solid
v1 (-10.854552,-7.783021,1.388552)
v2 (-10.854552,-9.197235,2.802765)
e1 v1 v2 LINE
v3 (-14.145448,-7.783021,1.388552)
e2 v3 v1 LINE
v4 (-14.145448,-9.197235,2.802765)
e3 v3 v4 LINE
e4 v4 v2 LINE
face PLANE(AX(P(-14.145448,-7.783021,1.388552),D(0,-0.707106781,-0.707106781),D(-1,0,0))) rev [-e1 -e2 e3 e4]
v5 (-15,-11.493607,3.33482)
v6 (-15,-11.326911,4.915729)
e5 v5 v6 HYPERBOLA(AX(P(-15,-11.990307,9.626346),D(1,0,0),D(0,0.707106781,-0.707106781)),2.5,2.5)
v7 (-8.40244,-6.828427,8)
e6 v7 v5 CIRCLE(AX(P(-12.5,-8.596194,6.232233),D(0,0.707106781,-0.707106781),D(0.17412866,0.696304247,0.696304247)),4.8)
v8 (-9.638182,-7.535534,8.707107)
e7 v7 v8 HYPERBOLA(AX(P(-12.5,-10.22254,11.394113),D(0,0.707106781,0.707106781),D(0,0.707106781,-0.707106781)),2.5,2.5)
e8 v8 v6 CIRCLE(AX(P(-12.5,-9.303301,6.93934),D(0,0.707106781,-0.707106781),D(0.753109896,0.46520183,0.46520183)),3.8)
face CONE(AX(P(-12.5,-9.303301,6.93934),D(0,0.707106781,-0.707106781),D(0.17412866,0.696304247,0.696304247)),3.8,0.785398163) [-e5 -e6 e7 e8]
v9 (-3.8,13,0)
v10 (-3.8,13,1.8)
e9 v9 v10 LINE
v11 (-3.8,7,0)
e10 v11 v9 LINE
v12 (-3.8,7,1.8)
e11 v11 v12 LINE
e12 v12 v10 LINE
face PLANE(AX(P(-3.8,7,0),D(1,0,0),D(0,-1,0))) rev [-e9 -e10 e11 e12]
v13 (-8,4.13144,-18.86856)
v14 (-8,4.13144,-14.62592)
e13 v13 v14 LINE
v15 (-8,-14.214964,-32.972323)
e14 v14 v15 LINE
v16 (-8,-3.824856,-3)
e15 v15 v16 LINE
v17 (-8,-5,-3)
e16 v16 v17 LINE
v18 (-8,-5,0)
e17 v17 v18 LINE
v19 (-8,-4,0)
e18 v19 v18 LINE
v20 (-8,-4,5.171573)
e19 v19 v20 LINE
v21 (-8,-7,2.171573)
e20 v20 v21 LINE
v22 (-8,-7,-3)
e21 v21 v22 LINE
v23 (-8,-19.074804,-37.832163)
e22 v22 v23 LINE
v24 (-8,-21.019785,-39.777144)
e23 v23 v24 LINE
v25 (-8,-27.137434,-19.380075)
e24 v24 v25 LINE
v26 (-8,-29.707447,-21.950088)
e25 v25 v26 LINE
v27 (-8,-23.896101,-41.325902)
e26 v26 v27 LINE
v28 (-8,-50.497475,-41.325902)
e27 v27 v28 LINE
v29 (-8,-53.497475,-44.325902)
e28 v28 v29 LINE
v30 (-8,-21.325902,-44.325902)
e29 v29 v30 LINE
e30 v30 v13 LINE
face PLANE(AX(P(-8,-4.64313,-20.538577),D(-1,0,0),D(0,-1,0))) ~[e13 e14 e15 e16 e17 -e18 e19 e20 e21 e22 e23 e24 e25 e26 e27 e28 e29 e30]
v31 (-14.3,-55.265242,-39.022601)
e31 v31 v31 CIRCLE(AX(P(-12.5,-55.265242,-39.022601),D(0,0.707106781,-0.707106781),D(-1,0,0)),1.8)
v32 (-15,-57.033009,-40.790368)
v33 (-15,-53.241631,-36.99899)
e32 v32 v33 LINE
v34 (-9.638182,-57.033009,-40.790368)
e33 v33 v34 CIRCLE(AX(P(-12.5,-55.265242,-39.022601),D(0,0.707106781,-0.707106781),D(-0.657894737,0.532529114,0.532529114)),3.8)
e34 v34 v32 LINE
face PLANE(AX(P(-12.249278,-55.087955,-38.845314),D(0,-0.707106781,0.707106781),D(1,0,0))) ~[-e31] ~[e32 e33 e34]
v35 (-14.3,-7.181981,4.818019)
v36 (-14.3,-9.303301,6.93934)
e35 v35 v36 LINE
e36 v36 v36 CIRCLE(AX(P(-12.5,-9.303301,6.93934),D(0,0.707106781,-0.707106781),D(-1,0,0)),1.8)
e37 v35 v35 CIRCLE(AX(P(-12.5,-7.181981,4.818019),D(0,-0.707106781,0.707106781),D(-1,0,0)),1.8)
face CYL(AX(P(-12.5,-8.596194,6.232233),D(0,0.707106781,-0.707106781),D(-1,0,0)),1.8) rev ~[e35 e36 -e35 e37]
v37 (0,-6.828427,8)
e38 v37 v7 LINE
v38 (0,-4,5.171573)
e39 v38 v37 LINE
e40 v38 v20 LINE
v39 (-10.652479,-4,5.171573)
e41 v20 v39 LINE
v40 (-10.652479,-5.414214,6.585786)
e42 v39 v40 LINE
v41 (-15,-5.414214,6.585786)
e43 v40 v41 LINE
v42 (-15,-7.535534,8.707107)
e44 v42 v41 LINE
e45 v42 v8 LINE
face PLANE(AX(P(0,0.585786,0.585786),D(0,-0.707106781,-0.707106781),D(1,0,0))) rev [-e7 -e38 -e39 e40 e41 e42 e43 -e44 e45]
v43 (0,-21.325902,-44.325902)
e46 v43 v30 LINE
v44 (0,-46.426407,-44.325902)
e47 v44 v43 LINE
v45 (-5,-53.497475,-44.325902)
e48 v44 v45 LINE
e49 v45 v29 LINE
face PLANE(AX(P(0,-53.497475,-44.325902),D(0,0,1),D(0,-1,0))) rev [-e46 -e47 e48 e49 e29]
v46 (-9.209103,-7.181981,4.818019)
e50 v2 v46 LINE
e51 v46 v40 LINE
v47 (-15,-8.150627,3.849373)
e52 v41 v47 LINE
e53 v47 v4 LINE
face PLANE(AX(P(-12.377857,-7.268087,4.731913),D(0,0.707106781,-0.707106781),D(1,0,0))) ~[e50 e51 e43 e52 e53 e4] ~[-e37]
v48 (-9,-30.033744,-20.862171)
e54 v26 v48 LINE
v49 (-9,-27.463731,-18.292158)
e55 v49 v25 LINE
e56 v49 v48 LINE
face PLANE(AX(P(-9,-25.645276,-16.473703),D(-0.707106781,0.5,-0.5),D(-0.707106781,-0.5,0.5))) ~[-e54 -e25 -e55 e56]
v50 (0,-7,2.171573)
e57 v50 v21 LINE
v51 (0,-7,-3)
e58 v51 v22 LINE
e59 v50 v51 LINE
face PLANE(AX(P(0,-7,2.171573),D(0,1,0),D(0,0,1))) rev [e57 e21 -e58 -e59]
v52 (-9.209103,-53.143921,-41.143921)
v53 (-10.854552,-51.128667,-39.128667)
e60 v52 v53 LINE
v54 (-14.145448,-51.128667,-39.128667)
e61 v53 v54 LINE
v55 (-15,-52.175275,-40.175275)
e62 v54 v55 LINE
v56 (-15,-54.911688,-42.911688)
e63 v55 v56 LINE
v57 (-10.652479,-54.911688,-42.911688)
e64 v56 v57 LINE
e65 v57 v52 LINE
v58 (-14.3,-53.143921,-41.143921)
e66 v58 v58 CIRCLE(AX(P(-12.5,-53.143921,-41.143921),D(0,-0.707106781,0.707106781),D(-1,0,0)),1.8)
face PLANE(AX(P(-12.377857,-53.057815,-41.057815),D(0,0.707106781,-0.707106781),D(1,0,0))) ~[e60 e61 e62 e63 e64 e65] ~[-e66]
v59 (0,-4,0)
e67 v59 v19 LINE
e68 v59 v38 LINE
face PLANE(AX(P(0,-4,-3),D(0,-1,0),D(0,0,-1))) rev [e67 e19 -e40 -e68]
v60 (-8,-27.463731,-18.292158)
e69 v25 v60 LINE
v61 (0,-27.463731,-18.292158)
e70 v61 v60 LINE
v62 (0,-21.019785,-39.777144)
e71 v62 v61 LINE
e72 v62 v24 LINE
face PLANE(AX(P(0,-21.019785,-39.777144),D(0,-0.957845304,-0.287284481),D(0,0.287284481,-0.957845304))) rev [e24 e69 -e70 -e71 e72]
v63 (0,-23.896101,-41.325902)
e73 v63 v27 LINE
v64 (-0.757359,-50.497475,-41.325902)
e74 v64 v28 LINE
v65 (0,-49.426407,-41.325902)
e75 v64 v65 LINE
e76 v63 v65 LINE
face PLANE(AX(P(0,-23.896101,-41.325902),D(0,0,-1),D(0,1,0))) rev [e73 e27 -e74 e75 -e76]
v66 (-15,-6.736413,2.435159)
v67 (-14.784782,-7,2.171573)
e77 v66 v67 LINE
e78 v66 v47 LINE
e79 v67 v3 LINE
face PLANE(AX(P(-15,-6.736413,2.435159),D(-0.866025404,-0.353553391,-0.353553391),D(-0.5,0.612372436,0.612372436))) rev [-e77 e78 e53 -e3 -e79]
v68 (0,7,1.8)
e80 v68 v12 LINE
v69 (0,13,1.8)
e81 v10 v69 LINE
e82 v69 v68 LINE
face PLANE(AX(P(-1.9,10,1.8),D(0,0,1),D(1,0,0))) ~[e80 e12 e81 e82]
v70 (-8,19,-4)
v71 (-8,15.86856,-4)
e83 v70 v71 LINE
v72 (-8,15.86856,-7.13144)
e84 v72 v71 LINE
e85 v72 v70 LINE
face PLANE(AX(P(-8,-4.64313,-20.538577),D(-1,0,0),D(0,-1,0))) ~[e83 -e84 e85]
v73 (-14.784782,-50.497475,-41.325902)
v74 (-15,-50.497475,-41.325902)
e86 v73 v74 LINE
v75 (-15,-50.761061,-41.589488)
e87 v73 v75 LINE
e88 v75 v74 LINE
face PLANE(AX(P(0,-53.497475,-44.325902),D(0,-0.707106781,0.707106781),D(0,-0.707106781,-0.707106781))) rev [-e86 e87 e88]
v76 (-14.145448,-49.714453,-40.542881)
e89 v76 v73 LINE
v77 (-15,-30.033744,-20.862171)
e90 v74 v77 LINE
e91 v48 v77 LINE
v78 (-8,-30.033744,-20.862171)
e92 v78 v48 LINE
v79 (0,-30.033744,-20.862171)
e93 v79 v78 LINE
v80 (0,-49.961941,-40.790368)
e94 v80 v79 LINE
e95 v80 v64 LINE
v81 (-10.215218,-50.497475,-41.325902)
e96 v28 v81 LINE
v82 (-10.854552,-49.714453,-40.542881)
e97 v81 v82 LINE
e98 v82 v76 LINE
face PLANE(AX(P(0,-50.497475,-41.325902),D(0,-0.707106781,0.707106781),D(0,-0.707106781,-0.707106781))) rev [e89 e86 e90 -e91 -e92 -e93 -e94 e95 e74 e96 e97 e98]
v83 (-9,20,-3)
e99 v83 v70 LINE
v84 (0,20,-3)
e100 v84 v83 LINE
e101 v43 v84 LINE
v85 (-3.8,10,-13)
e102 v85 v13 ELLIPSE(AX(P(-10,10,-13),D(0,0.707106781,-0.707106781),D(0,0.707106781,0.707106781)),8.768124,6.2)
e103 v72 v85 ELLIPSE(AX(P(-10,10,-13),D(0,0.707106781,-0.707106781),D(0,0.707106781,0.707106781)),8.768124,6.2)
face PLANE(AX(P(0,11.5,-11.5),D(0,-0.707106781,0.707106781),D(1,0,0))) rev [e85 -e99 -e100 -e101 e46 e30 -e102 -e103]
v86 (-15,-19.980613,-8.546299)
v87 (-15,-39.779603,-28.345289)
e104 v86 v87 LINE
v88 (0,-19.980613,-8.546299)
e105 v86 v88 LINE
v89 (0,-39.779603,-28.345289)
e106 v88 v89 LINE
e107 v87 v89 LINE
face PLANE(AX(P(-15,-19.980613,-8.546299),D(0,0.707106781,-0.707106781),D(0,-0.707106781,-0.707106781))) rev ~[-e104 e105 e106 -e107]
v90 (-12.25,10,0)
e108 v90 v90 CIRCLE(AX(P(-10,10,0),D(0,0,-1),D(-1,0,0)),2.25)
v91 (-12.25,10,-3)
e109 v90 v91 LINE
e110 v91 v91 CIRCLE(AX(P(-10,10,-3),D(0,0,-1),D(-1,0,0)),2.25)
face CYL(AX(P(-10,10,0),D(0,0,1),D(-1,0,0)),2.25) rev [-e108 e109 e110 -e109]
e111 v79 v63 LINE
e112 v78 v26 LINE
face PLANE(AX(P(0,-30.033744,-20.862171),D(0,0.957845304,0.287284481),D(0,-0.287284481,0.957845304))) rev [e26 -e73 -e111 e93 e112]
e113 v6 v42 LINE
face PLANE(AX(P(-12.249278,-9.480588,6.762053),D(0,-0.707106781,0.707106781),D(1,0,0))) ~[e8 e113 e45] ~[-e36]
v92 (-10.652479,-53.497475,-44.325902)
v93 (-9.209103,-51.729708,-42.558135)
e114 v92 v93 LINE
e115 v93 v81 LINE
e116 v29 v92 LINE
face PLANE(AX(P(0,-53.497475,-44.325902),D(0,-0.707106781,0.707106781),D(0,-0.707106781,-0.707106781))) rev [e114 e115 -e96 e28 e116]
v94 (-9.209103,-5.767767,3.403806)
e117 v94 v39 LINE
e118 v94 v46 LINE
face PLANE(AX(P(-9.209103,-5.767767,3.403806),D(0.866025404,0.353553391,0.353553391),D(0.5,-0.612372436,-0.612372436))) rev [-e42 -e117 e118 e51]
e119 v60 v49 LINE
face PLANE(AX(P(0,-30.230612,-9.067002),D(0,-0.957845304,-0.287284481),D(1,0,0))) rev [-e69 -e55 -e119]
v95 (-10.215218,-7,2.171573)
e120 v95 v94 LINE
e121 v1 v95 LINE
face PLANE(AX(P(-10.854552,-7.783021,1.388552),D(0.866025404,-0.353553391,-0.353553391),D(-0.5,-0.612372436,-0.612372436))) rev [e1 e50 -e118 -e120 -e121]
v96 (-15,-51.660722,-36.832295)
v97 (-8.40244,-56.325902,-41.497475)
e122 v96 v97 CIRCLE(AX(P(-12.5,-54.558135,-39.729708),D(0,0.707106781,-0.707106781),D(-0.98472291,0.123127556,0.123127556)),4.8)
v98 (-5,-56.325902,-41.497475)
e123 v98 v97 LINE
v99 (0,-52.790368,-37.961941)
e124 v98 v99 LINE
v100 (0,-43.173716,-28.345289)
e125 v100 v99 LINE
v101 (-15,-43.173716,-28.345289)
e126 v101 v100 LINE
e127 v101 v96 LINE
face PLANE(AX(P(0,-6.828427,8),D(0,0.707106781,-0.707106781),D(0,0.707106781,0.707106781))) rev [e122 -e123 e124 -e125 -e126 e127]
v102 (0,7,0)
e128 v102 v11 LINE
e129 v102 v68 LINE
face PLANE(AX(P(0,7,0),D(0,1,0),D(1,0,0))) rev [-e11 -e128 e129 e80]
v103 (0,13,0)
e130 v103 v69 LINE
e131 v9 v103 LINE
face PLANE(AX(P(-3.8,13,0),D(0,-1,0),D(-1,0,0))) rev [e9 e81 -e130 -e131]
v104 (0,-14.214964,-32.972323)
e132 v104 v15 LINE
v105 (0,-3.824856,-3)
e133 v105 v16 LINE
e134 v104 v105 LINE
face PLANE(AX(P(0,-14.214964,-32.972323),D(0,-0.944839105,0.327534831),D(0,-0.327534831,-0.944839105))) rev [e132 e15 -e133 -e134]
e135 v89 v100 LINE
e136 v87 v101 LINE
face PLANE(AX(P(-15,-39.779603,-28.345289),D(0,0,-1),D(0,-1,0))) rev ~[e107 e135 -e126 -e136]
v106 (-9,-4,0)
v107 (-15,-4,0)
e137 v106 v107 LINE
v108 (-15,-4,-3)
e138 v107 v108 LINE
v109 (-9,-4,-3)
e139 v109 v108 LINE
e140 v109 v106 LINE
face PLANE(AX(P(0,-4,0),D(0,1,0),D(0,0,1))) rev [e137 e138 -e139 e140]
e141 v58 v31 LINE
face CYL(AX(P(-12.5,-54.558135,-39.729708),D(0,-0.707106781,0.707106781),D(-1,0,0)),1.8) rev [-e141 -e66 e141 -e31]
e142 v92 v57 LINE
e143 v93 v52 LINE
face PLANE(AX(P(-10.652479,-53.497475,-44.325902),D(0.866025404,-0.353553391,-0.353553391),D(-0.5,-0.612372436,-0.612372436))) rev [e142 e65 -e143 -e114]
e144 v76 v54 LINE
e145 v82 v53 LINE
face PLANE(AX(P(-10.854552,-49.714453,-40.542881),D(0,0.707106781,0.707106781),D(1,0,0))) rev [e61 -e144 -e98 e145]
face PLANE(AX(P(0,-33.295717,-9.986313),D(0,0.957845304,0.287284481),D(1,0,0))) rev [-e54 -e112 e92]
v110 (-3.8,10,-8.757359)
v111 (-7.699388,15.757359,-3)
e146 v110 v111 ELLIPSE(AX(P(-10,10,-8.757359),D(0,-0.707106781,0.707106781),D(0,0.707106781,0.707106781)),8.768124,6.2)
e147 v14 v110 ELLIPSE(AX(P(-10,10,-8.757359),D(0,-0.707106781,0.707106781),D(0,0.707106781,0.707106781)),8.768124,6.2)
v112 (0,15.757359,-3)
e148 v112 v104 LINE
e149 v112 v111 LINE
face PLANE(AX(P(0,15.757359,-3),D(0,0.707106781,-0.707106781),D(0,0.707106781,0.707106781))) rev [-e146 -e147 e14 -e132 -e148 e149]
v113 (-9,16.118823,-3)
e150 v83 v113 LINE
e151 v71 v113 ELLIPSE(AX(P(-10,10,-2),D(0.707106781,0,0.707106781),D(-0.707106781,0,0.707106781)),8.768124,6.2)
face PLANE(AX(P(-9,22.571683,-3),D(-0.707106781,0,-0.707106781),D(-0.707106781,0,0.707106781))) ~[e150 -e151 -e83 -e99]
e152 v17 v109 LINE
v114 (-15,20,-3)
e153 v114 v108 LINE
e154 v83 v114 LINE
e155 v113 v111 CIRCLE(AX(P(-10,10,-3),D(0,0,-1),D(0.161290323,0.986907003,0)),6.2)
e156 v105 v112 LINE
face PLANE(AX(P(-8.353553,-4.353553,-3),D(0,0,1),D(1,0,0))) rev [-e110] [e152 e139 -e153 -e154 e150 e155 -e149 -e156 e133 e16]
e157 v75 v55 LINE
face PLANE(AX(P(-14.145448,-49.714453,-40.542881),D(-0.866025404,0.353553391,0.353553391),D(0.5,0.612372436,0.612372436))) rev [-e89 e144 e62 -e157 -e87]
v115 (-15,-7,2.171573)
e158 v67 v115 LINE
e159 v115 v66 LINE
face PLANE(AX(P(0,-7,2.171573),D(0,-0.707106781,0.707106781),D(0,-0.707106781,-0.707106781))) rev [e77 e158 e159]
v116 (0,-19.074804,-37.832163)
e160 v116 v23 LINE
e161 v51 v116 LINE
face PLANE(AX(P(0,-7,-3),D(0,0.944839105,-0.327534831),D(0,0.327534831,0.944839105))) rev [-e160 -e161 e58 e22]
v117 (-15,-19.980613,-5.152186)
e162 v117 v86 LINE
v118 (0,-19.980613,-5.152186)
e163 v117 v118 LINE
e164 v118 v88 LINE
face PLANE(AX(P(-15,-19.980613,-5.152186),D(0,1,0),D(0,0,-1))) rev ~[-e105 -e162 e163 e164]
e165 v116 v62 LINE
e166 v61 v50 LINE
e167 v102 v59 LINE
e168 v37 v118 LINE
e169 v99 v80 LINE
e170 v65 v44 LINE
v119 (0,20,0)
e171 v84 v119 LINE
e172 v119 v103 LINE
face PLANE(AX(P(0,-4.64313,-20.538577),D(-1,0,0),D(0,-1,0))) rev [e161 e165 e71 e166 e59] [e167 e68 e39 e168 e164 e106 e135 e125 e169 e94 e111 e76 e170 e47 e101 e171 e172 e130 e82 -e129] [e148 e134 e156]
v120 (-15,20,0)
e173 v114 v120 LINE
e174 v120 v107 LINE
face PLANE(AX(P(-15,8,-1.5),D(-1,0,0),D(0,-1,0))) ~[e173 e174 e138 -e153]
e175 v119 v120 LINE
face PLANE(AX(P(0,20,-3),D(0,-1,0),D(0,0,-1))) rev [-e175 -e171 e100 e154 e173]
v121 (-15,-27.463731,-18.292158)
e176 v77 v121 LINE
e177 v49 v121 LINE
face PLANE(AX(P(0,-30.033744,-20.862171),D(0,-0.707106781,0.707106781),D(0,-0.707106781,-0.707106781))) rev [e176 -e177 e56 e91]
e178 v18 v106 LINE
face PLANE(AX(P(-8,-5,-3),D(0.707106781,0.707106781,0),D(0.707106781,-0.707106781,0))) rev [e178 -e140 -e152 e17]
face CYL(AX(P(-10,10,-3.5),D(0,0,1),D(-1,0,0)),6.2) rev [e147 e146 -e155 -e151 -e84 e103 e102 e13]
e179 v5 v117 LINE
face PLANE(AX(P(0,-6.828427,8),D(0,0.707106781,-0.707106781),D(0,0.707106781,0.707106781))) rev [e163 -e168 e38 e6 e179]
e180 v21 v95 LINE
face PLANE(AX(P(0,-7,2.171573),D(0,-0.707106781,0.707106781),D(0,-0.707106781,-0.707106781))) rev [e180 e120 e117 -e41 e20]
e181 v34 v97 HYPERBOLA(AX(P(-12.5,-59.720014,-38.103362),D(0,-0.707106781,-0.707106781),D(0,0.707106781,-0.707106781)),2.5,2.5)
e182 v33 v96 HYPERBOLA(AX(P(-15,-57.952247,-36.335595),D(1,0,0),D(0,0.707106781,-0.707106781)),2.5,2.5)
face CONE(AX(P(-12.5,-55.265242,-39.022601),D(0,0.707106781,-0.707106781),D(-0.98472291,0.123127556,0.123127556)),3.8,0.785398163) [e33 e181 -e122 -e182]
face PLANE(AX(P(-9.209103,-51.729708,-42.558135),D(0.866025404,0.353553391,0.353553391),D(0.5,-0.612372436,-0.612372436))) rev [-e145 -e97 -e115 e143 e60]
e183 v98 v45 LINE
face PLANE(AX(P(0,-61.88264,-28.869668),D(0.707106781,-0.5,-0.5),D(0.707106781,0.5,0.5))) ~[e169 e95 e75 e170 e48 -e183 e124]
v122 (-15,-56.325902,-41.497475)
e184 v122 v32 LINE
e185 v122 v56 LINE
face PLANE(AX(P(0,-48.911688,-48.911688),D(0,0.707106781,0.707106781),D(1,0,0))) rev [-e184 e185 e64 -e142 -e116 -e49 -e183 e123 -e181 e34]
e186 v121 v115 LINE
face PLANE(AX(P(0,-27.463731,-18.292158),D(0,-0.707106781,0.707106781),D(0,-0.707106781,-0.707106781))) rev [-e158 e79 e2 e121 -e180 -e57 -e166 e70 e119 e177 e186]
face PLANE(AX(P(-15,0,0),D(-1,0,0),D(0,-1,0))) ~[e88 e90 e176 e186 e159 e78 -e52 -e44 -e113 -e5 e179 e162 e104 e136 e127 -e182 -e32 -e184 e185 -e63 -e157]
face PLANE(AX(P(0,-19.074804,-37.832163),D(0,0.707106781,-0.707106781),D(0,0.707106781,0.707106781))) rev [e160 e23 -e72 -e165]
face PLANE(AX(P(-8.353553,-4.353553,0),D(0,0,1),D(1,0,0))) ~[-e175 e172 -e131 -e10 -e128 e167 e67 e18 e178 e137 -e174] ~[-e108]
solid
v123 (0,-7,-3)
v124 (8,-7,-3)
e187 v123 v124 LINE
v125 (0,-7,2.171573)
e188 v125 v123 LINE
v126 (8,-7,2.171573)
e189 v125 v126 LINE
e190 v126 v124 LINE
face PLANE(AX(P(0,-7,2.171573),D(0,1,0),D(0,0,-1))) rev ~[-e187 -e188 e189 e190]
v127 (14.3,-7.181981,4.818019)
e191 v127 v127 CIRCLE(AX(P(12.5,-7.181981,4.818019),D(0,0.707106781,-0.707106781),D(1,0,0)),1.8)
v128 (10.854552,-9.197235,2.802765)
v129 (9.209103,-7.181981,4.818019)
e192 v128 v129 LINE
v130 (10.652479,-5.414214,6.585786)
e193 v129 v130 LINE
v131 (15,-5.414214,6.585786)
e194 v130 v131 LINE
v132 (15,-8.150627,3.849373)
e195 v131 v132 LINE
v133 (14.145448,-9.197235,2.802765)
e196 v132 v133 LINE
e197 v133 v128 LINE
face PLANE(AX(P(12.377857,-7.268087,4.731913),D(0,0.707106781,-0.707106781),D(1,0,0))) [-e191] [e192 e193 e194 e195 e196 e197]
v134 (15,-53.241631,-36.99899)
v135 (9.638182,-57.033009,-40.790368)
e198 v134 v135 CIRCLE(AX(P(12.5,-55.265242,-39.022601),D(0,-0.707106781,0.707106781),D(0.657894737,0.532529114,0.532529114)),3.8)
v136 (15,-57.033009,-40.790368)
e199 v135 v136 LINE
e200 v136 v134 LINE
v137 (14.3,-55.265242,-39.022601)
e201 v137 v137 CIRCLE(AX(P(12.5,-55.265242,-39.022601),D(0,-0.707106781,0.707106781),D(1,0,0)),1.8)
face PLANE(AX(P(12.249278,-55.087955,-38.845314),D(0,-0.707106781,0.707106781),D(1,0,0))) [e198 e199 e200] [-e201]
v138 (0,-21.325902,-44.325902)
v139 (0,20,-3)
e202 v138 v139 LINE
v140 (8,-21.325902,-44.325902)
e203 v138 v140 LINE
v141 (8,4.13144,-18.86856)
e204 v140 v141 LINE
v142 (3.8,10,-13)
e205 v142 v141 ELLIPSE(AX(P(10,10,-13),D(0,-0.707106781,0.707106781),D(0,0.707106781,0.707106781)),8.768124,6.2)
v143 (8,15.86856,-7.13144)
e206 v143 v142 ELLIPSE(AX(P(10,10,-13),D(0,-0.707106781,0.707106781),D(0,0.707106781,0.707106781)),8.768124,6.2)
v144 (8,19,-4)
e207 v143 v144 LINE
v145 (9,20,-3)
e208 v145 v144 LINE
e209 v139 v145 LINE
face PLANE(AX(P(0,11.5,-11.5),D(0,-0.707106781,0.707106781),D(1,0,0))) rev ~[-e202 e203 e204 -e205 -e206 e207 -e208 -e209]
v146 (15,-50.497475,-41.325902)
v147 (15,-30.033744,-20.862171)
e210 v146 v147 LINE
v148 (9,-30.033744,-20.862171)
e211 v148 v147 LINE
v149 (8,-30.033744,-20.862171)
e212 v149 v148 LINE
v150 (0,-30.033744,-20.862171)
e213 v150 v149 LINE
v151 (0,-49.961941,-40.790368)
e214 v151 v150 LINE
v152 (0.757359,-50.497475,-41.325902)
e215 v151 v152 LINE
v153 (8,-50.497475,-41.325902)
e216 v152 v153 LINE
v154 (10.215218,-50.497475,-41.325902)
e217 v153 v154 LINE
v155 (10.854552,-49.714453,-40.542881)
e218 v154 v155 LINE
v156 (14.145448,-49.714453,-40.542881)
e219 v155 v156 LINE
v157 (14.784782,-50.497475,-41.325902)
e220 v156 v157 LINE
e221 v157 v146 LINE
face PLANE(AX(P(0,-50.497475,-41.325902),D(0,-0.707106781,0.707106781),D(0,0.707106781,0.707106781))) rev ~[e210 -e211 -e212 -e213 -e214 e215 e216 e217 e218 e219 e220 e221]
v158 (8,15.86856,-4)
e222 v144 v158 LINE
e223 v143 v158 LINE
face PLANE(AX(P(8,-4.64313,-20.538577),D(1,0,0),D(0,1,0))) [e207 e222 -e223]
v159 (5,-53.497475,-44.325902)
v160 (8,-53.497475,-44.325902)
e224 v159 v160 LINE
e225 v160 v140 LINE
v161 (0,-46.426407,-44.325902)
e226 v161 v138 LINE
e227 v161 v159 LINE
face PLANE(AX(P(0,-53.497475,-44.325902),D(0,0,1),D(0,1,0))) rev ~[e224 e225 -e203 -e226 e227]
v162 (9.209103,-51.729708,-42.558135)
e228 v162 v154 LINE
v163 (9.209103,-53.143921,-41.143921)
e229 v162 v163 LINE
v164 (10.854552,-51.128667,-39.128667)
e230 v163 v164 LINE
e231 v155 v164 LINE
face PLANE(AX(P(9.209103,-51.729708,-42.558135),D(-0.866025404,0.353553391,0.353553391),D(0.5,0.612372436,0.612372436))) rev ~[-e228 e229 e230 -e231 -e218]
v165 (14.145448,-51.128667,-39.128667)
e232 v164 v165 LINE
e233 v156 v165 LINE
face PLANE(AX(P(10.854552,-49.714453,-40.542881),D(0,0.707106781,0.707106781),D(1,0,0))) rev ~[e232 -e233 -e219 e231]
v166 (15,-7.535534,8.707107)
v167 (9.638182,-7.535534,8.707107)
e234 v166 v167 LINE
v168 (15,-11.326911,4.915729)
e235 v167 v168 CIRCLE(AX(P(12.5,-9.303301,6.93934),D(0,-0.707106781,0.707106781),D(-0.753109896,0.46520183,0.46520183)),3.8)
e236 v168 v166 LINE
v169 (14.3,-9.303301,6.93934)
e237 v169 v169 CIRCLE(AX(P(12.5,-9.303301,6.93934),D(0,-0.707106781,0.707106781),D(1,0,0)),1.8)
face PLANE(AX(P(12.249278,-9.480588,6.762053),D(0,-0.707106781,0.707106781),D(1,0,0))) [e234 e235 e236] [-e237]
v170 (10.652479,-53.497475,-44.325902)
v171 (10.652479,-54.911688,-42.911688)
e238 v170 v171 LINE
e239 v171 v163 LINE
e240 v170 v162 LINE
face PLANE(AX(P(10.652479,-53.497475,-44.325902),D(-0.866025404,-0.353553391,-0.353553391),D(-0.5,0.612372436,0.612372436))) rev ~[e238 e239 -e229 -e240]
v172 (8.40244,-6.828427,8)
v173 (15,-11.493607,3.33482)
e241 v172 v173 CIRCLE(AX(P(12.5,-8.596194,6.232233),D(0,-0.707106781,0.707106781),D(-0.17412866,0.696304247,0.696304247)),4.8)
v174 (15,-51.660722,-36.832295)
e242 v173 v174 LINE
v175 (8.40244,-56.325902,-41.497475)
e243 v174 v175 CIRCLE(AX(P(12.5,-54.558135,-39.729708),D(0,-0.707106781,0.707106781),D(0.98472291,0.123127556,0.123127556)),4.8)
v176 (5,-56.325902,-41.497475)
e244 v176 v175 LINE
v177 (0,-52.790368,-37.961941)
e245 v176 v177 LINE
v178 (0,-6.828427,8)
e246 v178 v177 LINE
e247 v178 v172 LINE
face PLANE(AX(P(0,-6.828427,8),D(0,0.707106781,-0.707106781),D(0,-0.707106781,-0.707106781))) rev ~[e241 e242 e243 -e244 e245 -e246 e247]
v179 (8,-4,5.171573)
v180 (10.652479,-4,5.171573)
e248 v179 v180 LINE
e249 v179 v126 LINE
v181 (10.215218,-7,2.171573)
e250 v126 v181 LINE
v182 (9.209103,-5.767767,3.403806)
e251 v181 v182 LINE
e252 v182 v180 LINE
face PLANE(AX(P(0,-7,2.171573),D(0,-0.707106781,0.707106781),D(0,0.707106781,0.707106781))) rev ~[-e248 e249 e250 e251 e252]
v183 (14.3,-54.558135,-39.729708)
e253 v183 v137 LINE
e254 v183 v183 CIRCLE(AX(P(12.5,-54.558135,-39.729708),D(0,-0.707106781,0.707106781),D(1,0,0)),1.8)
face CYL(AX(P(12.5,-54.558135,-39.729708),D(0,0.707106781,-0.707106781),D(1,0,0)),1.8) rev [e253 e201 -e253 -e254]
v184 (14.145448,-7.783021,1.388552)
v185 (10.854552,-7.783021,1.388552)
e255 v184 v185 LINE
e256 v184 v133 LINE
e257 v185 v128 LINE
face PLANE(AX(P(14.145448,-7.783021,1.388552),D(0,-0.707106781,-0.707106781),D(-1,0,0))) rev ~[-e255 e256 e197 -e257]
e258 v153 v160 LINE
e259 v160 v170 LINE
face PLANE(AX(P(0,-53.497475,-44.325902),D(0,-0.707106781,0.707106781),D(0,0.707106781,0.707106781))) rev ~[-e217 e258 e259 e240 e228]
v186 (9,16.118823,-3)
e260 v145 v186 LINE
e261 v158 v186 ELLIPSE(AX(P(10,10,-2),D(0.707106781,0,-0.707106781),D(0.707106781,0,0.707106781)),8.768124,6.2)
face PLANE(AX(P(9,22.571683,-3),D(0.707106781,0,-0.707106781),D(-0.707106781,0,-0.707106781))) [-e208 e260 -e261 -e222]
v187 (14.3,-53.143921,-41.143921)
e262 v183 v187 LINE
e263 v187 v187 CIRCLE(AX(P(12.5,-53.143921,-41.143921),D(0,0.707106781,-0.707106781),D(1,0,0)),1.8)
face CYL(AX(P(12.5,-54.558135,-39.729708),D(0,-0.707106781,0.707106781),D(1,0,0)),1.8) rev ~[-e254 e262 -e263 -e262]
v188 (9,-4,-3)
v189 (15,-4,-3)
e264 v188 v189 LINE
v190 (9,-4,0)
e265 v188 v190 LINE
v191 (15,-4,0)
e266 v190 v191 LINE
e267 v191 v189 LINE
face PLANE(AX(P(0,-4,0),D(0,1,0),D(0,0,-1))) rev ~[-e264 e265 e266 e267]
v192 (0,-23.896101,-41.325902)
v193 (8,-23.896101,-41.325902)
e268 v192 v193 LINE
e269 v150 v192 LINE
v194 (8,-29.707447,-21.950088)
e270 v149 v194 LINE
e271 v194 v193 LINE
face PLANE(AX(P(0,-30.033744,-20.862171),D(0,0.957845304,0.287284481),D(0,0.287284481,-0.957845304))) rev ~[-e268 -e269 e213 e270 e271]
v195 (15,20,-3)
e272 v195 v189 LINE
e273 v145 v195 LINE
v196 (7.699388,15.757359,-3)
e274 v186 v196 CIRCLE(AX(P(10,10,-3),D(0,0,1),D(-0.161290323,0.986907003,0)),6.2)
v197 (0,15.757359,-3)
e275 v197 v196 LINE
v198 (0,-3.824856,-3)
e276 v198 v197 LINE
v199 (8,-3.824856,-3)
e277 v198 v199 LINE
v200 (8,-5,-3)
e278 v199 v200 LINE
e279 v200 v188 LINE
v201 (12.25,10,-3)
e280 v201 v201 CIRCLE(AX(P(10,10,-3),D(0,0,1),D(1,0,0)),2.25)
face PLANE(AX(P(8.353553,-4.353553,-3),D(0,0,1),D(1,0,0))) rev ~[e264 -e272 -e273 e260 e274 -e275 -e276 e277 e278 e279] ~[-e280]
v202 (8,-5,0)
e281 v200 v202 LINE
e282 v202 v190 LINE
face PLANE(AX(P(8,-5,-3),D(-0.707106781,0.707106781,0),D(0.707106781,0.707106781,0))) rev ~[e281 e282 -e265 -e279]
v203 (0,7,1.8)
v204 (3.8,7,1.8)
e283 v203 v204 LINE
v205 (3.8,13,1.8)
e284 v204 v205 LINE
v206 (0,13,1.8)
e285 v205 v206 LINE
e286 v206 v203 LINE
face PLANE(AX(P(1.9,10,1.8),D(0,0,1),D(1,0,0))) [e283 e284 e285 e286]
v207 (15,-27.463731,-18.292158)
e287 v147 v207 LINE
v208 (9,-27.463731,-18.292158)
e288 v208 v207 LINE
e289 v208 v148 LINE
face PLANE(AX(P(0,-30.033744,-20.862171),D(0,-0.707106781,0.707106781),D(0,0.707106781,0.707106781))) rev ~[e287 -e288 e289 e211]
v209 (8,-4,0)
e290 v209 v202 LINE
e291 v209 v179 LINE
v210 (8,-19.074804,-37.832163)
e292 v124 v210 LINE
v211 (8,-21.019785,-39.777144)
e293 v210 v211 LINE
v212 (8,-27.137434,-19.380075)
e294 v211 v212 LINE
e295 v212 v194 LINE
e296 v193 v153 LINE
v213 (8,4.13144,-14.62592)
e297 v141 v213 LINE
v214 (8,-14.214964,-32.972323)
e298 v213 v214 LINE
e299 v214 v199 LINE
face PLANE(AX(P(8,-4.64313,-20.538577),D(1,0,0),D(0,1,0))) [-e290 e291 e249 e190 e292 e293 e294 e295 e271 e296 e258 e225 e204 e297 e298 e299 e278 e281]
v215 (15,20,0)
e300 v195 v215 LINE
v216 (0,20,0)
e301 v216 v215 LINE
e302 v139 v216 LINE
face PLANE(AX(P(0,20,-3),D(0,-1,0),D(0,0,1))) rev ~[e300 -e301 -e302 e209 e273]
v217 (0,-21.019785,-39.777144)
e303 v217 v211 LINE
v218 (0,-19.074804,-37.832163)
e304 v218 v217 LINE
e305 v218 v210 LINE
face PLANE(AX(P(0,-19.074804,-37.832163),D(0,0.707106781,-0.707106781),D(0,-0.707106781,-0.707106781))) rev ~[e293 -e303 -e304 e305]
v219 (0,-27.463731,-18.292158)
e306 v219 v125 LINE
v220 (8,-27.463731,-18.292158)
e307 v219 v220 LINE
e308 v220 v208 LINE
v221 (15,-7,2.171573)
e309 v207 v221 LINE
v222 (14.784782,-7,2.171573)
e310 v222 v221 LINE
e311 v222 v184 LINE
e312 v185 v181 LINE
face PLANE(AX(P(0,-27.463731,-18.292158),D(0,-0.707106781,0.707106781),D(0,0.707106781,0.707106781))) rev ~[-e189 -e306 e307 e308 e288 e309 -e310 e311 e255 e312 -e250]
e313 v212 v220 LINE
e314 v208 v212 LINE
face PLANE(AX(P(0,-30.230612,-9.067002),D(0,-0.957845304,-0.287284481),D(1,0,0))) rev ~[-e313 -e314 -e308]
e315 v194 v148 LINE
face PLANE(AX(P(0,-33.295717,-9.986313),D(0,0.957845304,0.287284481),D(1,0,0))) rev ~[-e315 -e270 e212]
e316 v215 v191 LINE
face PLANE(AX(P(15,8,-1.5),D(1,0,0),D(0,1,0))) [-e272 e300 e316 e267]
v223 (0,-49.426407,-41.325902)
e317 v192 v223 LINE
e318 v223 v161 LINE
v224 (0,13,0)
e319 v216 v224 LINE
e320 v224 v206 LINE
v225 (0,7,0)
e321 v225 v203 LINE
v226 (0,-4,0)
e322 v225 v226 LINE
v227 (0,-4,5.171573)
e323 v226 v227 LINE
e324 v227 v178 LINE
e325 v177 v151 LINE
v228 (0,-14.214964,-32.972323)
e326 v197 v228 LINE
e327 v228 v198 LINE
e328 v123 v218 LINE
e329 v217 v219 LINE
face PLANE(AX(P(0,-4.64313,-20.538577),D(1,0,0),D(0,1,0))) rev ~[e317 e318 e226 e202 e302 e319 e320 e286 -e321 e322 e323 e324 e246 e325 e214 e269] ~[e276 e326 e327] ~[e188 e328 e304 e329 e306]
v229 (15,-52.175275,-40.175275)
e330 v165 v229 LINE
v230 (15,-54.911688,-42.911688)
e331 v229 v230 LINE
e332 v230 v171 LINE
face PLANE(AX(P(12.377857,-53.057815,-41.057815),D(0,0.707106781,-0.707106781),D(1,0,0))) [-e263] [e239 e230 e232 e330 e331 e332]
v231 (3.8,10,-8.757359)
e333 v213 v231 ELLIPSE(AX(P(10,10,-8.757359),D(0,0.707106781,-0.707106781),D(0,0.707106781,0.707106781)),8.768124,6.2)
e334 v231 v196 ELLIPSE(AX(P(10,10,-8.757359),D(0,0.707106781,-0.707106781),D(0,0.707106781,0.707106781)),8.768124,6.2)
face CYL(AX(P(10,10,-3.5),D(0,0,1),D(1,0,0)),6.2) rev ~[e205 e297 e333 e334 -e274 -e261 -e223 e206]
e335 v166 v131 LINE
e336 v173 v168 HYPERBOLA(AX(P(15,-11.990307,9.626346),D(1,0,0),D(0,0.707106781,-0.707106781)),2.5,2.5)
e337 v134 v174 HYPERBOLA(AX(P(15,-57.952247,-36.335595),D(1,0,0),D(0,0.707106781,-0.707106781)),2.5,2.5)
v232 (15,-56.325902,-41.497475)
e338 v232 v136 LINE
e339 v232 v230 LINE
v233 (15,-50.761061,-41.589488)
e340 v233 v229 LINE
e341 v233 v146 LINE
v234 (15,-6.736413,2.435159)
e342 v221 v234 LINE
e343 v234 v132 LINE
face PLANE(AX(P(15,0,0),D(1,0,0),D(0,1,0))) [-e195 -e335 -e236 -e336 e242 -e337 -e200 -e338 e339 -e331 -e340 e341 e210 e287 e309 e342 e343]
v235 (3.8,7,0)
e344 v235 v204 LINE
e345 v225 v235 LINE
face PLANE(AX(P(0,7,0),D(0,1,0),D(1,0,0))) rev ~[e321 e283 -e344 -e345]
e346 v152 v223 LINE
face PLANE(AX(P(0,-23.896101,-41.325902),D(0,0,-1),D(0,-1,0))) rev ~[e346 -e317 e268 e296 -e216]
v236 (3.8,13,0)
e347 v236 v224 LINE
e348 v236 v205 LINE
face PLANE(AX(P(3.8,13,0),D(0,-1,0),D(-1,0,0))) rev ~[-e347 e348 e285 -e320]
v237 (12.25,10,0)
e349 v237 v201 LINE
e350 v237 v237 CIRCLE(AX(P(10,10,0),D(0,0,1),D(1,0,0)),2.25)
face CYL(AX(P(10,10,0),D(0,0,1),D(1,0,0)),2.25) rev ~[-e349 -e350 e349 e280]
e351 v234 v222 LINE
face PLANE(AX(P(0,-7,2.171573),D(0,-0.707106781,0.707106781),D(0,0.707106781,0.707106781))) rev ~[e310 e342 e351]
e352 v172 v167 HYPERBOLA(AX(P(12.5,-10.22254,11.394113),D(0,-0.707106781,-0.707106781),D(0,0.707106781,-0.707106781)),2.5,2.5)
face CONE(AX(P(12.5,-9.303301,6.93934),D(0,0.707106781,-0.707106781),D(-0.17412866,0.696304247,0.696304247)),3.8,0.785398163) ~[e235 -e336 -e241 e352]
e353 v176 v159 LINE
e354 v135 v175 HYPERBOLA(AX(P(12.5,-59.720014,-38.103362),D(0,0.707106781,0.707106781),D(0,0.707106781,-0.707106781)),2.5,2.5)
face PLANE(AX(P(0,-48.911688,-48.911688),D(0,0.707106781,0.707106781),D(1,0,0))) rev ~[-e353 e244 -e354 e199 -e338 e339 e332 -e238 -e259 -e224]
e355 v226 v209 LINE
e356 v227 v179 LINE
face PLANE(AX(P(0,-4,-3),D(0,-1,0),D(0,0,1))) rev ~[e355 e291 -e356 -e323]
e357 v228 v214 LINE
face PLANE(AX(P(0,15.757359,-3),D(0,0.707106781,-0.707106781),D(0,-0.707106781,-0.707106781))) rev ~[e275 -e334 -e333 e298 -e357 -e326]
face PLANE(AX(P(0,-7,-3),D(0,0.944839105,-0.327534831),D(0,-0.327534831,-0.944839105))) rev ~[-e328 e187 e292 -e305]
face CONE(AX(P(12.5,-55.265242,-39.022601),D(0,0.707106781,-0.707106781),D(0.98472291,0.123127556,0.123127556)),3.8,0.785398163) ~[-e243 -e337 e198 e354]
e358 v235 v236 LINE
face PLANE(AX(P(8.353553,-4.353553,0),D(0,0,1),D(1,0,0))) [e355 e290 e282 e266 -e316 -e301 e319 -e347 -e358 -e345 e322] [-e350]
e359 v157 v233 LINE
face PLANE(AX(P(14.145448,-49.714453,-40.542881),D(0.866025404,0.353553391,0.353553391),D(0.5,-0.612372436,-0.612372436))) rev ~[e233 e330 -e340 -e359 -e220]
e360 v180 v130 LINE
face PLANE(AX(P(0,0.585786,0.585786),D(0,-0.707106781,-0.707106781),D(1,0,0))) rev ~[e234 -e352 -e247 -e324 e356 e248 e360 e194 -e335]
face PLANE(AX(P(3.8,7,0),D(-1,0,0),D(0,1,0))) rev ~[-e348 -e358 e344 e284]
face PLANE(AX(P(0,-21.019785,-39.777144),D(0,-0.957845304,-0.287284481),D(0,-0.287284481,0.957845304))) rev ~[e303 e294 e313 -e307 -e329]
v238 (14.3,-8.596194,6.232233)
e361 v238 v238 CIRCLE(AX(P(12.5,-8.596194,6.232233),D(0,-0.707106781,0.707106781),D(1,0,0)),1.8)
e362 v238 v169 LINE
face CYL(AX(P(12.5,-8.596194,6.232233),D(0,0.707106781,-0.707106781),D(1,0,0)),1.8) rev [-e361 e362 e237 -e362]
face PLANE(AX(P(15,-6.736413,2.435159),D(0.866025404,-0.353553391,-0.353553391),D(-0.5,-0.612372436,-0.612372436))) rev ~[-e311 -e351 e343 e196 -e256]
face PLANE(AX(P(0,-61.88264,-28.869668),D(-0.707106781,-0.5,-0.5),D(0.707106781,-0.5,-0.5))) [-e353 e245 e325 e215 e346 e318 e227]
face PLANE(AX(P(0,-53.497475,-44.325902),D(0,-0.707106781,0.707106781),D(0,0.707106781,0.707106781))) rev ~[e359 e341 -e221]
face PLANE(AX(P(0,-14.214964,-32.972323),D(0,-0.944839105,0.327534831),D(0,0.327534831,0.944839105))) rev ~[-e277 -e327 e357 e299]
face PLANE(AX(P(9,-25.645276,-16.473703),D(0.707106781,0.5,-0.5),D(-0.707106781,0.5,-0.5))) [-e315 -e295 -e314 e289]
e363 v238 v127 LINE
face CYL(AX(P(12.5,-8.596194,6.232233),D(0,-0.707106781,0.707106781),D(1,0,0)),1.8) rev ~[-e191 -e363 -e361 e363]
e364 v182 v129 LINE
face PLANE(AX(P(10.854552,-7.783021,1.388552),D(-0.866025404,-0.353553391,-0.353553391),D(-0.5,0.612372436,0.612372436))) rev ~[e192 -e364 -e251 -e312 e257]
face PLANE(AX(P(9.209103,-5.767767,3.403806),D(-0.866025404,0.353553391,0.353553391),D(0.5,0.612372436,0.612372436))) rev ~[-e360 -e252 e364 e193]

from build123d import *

# Parameters (mm, degrees)
F1_DEPTH      = 15
F2_DEPTH      = 8
F4_DEPTH      = 1.8
F3_R          = 2.25
F5_DEPTH      = 44.3269018078
F6_START      = -3
F6_DEPTH      = 41.3269018078
F7_R          = 1.8
F8_DEPTH      = 4
F9_DEPTH      = 1
F10_T1_DEPTH  = 3
F10_T6_ANGLE  = 249.9440889996
F10_T12_ANGLE = 249.9440889996
F10_T18_DEPTH = 8.7779135172
F10_T24_DEPTH = 9.2748056755
F10_S25_R     = 6.2
F10_T26_DEPTH = 6
F11_R         = 1.8
F12_DEPTH     = 2
F13_T1_DEPTH  = 29.7168298797
F16_DEPTH     = 15


# Not quite as in the source:
# - a fillet or chamfer that OpenCascade refuses, or shapes differently, is made with other operations: its cross-section is extruded or revolved along the edge and cut away or added


with BuildPart() as f1:
    # F0 (on Right) → F1 (new body)
    with BuildSketch(Plane.YZ):
        Polygon((-7, 2.1715728753), (-4, 5.1715728753), (-6.8284271247, 8), (-56.3259018078, -41.4974746831), (-53.4974746831, -44.3259018078), (-50.4974746831, -41.3259018078), (-30.033743948, -20.8621710728), (-27.463730735, -18.2921578598), align=None)
    extrude(amount=F1_DEPTH)



with BuildPart() as f1b:
    # F0 (on Right) → F1, piece 2 (new body)
    with BuildSketch(Plane.YZ):
        Polygon((20, 0), (0, 0), (-4, 0), (-4, -3), (-3.8248562286, -3), (15.7573593129, -3), (20, -3), align=None)
    extrude(amount=F1_DEPTH)


with BuildPart() as f1_1:
    add(f1.part)

    add(f1b.part)  # F2 merges F1b
    # F0 (on Right) → F2 (join)
    with BuildSketch(Plane.YZ):
        Polygon((-21.3259018078, -44.3259018078), (20, -3), (15.7573593129, -3), (-14.2149635258, -32.9723228387), (-3.8248562286, -3), (-4, -3), (-7, -3), (-19.0748035156, -37.8321628285), align=None)
        Polygon((-53.4974746831, -44.3259018078), (-21.3259018078, -44.3259018078), (-19.0748035156, -37.8321628285), (-21.0197849861, -39.777144299), (-27.463730735, -18.2921578598), (-30.033743948, -20.8621710728), (-23.8961012248, -41.3259018078), (-50.4974746831, -41.3259018078), align=None)
        Polygon((-4, -3), (-4, 0), (-4, 5.1715728753), (-7, 2.1715728753), (-7, -3), align=None)
    extrude(amount=F2_DEPTH)

    # F3 (on face) → F4 (join)
    with BuildSketch(Plane.XY):
        Polygon((3.8, 7), (3.8, 10), (3.8, 13), (0, 13), (0, 7), align=None)
    extrude(amount=F4_DEPTH)

    # F3 (on face) → F5 (cut, through all)
    with BuildSketch(Plane.XY):
        with Locations((10, 10)):
            Circle(F3_R)
    extrude(amount=-F5_DEPTH, mode=Mode.SUBTRACT)

    # F3 (on face) → F6 (cut)
    with BuildSketch(Plane.XY.offset(F6_START)):
        with BuildLine():
            Line((15, 6.333939444), (15, 13.666060556))
            ThreePointArc((15, 13.666060556), (8.0712698478, 15.8923679451), (3.8, 10))
            ThreePointArc((3.8, 10), (8.0712698478, 4.1076320549), (15, 6.333939444))
        make_face()
        with Locations((10, 10)):
            Circle(F3_R, mode=Mode.SUBTRACT)
    extrude(amount=-F6_DEPTH, mode=Mode.SUBTRACT)

    # F7 (on face) → F8 (cut, through all)
    with BuildSketch(Plane(origin=(0, -7.4142135624, 7.4142135624), x_dir=(1, 0, 0), z_dir=(0, -0.7071067812, 0.7071067812))):
        with Locations((12.5, -1.6715728753)):
            Circle(F7_R)
        with Locations((12.5, -66.6715728753)):
            Circle(F7_R)
    extrude(amount=-F8_DEPTH, mode=Mode.SUBTRACT)

    # F7 (on face) → F9 (join)
    with BuildSketch(Plane(origin=(0, -7.4142135624, 7.4142135624), x_dir=(1, 0, 0), z_dir=(0, -0.7071067812, 0.7071067812))):
        with BuildLine():
            Line((15, 0.8284271247), (9.6381823957, 0.8284271247))
            ThreePointArc((9.6381823957, 0.8284271247), (9.8129942315, -4.3585786438), (15, -4.5333904795))
            Line((15, -4.5333904795), (15, 0.8284271247))
        make_face()
        with Locations((12.5, -1.6715728753)):
            Circle(F7_R, mode=Mode.SUBTRACT)
        with BuildLine():
            Line((15, -69.1715728753), (15, -63.809755271))
            ThreePointArc((15, -63.809755271), (9.8129942315, -63.9845671067), (9.6381823957, -69.1715728753))
            Line((9.6381823957, -69.1715728753), (15, -69.1715728753))
        make_face()
        with Locations((12.5, -66.6715728753)):
            Circle(F7_R, mode=Mode.SUBTRACT)
    extrude(amount=F9_DEPTH)

    # F10: chamfer of 1 on 5 edges, made by hand

    # F10_s2 → F10_t1 (join)
    with BuildSketch(Plane.XY.offset(-3)):
        Polygon((8, -5), (9, -4), (8, -4), align=None)
    extrude(amount=F10_T1_DEPTH)


with BuildPart() as f10_tool4:
    # F10_s5 → F10_t6 (revolve)
    with BuildSketch(Plane(origin=(11.8343680608, 1.4797429858, 1.4797429858), x_dir=(-0.1240716356, 0.9922732634, 0), z_dir=(0.9847229102, 0.1231275563, 0.1231275563))):
        Polygon((-8.0747037896, 8.1677022303), (-6.6605321208, 8.1568168681), (-7.3730606363, 7.4551737148), align=None)
    revolve(axis=Axis((12.5, -8.5961940777, 6.232233047), (0, -0.7071067812, 0.7071067812)), revolution_arc=F10_T6_ANGLE)

    split(bisect_by=Plane(origin=(0, 0.5857864376, 0.5857864376), x_dir=(1, 0, 0), z_dir=(0, -0.7071067812, -0.7071067812)), keep=Keep.TOP)

    split(bisect_by=Plane.YZ.offset(15), keep=Keep.BOTTOM)


with BuildPart() as f1_2:
    add(f1_1.part)

    # F10_t3: union F10_tool4
    add(f10_tool4.part)


with BuildPart() as f10_tool10:
    # F10_s11 → F10_t12 (revolve)
    with BuildSketch(Plane(origin=(11.8110831902, -47.2300619137, -47.2300619137), x_dir=(0.9701252548, 0.242604596, 0), z_dir=(0.17412866, -0.6963042474, -0.6963042474))):
        Polygon((2.462632391, 12.0869174199), (3.6193556211, 11.2732888997), (2.6341797459, 11.1017415448), align=None)
    revolve(axis=Axis((12.5, -54.5581348548, -39.7297077301), (0, -0.7071067812, 0.7071067812)), revolution_arc=F10_T12_ANGLE)

    split(bisect_by=Plane(origin=(0, -48.9116882454, -48.9116882454), x_dir=(1, 0, 0), z_dir=(0, 0.7071067812, 0.7071067812)), keep=Keep.TOP)

    split(bisect_by=Plane.YZ.offset(15), keep=Keep.BOTTOM)


with BuildPart() as f1_3:
    add(f1_2.part)

    # F10_t9: union F10_tool10
    add(f10_tool10.part)


with BuildPart() as f10_tool16:
    # F10_s17 → F10_t18 (new body)
    with BuildSketch(Plane(origin=(0, -21.0594898175, -21.0594898175), x_dir=(1, 0, 0), z_dir=(0, -0.7071067812, -0.7071067812))):
        Polygon((9, 6.4852813742), (8, 5.4852813742), (8, 6.4852813742), align=None)
    extrude(amount=F10_T18_DEPTH)

    split(bisect_by=Plane(origin=(0, -30.2306117792, -9.0670023373), x_dir=(1, 0, 0), z_dir=(0, -0.9578453043, -0.2872844809)), keep=Keep.TOP)

    split(bisect_by=Plane(origin=(0, -33.295716753, -9.9863126763), x_dir=(1, 0, 0), z_dir=(0, 0.9578453043, 0.2872844809)), keep=Keep.TOP)


with BuildPart() as f1_4:
    add(f1_3.part)

    # F10_t15: union F10_tool16
    add(f10_tool16.part)


with BuildPart() as f10_tool22:
    # F10_s23 → F10_t24 (new body)
    with BuildSketch(Plane.XZ.offset(-22.571682988)):
        Polygon((9, -3), (8, -4), (8, -3), align=None)
    extrude(amount=F10_T24_DEPTH)

    # F10_s25 → F10_t26 (cut, symmetric)
    with BuildSketch(Plane.XY.offset(-3.5)):
        with Locations((10, 10)):
            Circle(F10_S25_R)
    extrude(amount=F10_T26_DEPTH, both=True, mode=Mode.SUBTRACT)

    split(bisect_by=Plane(origin=(0, 11.5, -11.5), x_dir=(1, 0, 0), z_dir=(0, -0.7071067812, 0.7071067812)), keep=Keep.TOP)


with BuildPart() as f1_5:
    add(f1_4.part)

    # F10_t21: union F10_tool22
    add(f10_tool22.part)

    # F11 (on face) → F12 (cut)
    with BuildSketch(Plane(origin=(0, -4.5857864376, 4.5857864376), x_dir=(1, 0, 0), z_dir=(0, 0.7071067812, -0.7071067812))):
        Polygon((10.6524791385, -0.8284271247), (14.3475208615, -0.8284271247), (15, 0.301699894), (15, 3.0414458562), (14.1454482672, 4.5215728751), (10.8545517328, 4.5215728751), (9.2091034656, 1.6715728751), align=None)
        with Locations((12.5, 1.6715728753)):
            Circle(F11_R, mode=Mode.SUBTRACT)
        Polygon((14.1454482672, 63.8215728752), (15, 65.3016998941), (15, 68.0414458563), (14.3475208614, 69.1715728753), (10.6524791386, 69.1715728753), (9.2091034656, 66.6715728752), (10.8545517328, 63.8215728752), align=None)
        with Locations((12.5, 66.6715728753)):
            Circle(F11_R, mode=Mode.SUBTRACT)
        Polygon((14.3475208614, 69.1715728753), (15, 68.0414458563), (15, 69.1715728753), align=None)
        Polygon((15, 0.301699894), (14.3475208615, -0.8284271247), (15, -0.8284271247), align=None)
    extrude(amount=-F12_DEPTH, mode=Mode.SUBTRACT)

    # F13: chamfer of 5 on 1 edges, made by hand

    # F13_s2 → F13_t1 (cut)
    with BuildSketch(Plane(origin=(0, -16.5064859616, 16.5064859616), x_dir=(1, 0, 0), z_dir=(0, 0.7071067812, -0.7071067812))):
        Polygon((0, 64.1715728753), (5, 69.1715728753), (0, 69.1715728753), align=None)
    extrude(amount=F13_T1_DEPTH, mode=Mode.SUBTRACT)


with BuildPart() as f14_1:
    # F14: instance of F1
    add(f1_5.part.mirror(Plane.YZ))

    # F15 (on face) → F16 (cut, through all)
    with BuildSketch(Plane(origin=(-15, 0, 0), x_dir=(0, -1, 0), z_dir=(-1, 0, 0))):
        Polygon((43.1737156777, -28.345288553), (19.9806132548, -5.1521861301), (19.9806132548, -8.5462986798), (39.779603128, -28.345288553), align=None)
    extrude(amount=-F16_DEPTH, mode=Mode.SUBTRACT)


solid = Compound([f1_5.part, f14_1.part])
